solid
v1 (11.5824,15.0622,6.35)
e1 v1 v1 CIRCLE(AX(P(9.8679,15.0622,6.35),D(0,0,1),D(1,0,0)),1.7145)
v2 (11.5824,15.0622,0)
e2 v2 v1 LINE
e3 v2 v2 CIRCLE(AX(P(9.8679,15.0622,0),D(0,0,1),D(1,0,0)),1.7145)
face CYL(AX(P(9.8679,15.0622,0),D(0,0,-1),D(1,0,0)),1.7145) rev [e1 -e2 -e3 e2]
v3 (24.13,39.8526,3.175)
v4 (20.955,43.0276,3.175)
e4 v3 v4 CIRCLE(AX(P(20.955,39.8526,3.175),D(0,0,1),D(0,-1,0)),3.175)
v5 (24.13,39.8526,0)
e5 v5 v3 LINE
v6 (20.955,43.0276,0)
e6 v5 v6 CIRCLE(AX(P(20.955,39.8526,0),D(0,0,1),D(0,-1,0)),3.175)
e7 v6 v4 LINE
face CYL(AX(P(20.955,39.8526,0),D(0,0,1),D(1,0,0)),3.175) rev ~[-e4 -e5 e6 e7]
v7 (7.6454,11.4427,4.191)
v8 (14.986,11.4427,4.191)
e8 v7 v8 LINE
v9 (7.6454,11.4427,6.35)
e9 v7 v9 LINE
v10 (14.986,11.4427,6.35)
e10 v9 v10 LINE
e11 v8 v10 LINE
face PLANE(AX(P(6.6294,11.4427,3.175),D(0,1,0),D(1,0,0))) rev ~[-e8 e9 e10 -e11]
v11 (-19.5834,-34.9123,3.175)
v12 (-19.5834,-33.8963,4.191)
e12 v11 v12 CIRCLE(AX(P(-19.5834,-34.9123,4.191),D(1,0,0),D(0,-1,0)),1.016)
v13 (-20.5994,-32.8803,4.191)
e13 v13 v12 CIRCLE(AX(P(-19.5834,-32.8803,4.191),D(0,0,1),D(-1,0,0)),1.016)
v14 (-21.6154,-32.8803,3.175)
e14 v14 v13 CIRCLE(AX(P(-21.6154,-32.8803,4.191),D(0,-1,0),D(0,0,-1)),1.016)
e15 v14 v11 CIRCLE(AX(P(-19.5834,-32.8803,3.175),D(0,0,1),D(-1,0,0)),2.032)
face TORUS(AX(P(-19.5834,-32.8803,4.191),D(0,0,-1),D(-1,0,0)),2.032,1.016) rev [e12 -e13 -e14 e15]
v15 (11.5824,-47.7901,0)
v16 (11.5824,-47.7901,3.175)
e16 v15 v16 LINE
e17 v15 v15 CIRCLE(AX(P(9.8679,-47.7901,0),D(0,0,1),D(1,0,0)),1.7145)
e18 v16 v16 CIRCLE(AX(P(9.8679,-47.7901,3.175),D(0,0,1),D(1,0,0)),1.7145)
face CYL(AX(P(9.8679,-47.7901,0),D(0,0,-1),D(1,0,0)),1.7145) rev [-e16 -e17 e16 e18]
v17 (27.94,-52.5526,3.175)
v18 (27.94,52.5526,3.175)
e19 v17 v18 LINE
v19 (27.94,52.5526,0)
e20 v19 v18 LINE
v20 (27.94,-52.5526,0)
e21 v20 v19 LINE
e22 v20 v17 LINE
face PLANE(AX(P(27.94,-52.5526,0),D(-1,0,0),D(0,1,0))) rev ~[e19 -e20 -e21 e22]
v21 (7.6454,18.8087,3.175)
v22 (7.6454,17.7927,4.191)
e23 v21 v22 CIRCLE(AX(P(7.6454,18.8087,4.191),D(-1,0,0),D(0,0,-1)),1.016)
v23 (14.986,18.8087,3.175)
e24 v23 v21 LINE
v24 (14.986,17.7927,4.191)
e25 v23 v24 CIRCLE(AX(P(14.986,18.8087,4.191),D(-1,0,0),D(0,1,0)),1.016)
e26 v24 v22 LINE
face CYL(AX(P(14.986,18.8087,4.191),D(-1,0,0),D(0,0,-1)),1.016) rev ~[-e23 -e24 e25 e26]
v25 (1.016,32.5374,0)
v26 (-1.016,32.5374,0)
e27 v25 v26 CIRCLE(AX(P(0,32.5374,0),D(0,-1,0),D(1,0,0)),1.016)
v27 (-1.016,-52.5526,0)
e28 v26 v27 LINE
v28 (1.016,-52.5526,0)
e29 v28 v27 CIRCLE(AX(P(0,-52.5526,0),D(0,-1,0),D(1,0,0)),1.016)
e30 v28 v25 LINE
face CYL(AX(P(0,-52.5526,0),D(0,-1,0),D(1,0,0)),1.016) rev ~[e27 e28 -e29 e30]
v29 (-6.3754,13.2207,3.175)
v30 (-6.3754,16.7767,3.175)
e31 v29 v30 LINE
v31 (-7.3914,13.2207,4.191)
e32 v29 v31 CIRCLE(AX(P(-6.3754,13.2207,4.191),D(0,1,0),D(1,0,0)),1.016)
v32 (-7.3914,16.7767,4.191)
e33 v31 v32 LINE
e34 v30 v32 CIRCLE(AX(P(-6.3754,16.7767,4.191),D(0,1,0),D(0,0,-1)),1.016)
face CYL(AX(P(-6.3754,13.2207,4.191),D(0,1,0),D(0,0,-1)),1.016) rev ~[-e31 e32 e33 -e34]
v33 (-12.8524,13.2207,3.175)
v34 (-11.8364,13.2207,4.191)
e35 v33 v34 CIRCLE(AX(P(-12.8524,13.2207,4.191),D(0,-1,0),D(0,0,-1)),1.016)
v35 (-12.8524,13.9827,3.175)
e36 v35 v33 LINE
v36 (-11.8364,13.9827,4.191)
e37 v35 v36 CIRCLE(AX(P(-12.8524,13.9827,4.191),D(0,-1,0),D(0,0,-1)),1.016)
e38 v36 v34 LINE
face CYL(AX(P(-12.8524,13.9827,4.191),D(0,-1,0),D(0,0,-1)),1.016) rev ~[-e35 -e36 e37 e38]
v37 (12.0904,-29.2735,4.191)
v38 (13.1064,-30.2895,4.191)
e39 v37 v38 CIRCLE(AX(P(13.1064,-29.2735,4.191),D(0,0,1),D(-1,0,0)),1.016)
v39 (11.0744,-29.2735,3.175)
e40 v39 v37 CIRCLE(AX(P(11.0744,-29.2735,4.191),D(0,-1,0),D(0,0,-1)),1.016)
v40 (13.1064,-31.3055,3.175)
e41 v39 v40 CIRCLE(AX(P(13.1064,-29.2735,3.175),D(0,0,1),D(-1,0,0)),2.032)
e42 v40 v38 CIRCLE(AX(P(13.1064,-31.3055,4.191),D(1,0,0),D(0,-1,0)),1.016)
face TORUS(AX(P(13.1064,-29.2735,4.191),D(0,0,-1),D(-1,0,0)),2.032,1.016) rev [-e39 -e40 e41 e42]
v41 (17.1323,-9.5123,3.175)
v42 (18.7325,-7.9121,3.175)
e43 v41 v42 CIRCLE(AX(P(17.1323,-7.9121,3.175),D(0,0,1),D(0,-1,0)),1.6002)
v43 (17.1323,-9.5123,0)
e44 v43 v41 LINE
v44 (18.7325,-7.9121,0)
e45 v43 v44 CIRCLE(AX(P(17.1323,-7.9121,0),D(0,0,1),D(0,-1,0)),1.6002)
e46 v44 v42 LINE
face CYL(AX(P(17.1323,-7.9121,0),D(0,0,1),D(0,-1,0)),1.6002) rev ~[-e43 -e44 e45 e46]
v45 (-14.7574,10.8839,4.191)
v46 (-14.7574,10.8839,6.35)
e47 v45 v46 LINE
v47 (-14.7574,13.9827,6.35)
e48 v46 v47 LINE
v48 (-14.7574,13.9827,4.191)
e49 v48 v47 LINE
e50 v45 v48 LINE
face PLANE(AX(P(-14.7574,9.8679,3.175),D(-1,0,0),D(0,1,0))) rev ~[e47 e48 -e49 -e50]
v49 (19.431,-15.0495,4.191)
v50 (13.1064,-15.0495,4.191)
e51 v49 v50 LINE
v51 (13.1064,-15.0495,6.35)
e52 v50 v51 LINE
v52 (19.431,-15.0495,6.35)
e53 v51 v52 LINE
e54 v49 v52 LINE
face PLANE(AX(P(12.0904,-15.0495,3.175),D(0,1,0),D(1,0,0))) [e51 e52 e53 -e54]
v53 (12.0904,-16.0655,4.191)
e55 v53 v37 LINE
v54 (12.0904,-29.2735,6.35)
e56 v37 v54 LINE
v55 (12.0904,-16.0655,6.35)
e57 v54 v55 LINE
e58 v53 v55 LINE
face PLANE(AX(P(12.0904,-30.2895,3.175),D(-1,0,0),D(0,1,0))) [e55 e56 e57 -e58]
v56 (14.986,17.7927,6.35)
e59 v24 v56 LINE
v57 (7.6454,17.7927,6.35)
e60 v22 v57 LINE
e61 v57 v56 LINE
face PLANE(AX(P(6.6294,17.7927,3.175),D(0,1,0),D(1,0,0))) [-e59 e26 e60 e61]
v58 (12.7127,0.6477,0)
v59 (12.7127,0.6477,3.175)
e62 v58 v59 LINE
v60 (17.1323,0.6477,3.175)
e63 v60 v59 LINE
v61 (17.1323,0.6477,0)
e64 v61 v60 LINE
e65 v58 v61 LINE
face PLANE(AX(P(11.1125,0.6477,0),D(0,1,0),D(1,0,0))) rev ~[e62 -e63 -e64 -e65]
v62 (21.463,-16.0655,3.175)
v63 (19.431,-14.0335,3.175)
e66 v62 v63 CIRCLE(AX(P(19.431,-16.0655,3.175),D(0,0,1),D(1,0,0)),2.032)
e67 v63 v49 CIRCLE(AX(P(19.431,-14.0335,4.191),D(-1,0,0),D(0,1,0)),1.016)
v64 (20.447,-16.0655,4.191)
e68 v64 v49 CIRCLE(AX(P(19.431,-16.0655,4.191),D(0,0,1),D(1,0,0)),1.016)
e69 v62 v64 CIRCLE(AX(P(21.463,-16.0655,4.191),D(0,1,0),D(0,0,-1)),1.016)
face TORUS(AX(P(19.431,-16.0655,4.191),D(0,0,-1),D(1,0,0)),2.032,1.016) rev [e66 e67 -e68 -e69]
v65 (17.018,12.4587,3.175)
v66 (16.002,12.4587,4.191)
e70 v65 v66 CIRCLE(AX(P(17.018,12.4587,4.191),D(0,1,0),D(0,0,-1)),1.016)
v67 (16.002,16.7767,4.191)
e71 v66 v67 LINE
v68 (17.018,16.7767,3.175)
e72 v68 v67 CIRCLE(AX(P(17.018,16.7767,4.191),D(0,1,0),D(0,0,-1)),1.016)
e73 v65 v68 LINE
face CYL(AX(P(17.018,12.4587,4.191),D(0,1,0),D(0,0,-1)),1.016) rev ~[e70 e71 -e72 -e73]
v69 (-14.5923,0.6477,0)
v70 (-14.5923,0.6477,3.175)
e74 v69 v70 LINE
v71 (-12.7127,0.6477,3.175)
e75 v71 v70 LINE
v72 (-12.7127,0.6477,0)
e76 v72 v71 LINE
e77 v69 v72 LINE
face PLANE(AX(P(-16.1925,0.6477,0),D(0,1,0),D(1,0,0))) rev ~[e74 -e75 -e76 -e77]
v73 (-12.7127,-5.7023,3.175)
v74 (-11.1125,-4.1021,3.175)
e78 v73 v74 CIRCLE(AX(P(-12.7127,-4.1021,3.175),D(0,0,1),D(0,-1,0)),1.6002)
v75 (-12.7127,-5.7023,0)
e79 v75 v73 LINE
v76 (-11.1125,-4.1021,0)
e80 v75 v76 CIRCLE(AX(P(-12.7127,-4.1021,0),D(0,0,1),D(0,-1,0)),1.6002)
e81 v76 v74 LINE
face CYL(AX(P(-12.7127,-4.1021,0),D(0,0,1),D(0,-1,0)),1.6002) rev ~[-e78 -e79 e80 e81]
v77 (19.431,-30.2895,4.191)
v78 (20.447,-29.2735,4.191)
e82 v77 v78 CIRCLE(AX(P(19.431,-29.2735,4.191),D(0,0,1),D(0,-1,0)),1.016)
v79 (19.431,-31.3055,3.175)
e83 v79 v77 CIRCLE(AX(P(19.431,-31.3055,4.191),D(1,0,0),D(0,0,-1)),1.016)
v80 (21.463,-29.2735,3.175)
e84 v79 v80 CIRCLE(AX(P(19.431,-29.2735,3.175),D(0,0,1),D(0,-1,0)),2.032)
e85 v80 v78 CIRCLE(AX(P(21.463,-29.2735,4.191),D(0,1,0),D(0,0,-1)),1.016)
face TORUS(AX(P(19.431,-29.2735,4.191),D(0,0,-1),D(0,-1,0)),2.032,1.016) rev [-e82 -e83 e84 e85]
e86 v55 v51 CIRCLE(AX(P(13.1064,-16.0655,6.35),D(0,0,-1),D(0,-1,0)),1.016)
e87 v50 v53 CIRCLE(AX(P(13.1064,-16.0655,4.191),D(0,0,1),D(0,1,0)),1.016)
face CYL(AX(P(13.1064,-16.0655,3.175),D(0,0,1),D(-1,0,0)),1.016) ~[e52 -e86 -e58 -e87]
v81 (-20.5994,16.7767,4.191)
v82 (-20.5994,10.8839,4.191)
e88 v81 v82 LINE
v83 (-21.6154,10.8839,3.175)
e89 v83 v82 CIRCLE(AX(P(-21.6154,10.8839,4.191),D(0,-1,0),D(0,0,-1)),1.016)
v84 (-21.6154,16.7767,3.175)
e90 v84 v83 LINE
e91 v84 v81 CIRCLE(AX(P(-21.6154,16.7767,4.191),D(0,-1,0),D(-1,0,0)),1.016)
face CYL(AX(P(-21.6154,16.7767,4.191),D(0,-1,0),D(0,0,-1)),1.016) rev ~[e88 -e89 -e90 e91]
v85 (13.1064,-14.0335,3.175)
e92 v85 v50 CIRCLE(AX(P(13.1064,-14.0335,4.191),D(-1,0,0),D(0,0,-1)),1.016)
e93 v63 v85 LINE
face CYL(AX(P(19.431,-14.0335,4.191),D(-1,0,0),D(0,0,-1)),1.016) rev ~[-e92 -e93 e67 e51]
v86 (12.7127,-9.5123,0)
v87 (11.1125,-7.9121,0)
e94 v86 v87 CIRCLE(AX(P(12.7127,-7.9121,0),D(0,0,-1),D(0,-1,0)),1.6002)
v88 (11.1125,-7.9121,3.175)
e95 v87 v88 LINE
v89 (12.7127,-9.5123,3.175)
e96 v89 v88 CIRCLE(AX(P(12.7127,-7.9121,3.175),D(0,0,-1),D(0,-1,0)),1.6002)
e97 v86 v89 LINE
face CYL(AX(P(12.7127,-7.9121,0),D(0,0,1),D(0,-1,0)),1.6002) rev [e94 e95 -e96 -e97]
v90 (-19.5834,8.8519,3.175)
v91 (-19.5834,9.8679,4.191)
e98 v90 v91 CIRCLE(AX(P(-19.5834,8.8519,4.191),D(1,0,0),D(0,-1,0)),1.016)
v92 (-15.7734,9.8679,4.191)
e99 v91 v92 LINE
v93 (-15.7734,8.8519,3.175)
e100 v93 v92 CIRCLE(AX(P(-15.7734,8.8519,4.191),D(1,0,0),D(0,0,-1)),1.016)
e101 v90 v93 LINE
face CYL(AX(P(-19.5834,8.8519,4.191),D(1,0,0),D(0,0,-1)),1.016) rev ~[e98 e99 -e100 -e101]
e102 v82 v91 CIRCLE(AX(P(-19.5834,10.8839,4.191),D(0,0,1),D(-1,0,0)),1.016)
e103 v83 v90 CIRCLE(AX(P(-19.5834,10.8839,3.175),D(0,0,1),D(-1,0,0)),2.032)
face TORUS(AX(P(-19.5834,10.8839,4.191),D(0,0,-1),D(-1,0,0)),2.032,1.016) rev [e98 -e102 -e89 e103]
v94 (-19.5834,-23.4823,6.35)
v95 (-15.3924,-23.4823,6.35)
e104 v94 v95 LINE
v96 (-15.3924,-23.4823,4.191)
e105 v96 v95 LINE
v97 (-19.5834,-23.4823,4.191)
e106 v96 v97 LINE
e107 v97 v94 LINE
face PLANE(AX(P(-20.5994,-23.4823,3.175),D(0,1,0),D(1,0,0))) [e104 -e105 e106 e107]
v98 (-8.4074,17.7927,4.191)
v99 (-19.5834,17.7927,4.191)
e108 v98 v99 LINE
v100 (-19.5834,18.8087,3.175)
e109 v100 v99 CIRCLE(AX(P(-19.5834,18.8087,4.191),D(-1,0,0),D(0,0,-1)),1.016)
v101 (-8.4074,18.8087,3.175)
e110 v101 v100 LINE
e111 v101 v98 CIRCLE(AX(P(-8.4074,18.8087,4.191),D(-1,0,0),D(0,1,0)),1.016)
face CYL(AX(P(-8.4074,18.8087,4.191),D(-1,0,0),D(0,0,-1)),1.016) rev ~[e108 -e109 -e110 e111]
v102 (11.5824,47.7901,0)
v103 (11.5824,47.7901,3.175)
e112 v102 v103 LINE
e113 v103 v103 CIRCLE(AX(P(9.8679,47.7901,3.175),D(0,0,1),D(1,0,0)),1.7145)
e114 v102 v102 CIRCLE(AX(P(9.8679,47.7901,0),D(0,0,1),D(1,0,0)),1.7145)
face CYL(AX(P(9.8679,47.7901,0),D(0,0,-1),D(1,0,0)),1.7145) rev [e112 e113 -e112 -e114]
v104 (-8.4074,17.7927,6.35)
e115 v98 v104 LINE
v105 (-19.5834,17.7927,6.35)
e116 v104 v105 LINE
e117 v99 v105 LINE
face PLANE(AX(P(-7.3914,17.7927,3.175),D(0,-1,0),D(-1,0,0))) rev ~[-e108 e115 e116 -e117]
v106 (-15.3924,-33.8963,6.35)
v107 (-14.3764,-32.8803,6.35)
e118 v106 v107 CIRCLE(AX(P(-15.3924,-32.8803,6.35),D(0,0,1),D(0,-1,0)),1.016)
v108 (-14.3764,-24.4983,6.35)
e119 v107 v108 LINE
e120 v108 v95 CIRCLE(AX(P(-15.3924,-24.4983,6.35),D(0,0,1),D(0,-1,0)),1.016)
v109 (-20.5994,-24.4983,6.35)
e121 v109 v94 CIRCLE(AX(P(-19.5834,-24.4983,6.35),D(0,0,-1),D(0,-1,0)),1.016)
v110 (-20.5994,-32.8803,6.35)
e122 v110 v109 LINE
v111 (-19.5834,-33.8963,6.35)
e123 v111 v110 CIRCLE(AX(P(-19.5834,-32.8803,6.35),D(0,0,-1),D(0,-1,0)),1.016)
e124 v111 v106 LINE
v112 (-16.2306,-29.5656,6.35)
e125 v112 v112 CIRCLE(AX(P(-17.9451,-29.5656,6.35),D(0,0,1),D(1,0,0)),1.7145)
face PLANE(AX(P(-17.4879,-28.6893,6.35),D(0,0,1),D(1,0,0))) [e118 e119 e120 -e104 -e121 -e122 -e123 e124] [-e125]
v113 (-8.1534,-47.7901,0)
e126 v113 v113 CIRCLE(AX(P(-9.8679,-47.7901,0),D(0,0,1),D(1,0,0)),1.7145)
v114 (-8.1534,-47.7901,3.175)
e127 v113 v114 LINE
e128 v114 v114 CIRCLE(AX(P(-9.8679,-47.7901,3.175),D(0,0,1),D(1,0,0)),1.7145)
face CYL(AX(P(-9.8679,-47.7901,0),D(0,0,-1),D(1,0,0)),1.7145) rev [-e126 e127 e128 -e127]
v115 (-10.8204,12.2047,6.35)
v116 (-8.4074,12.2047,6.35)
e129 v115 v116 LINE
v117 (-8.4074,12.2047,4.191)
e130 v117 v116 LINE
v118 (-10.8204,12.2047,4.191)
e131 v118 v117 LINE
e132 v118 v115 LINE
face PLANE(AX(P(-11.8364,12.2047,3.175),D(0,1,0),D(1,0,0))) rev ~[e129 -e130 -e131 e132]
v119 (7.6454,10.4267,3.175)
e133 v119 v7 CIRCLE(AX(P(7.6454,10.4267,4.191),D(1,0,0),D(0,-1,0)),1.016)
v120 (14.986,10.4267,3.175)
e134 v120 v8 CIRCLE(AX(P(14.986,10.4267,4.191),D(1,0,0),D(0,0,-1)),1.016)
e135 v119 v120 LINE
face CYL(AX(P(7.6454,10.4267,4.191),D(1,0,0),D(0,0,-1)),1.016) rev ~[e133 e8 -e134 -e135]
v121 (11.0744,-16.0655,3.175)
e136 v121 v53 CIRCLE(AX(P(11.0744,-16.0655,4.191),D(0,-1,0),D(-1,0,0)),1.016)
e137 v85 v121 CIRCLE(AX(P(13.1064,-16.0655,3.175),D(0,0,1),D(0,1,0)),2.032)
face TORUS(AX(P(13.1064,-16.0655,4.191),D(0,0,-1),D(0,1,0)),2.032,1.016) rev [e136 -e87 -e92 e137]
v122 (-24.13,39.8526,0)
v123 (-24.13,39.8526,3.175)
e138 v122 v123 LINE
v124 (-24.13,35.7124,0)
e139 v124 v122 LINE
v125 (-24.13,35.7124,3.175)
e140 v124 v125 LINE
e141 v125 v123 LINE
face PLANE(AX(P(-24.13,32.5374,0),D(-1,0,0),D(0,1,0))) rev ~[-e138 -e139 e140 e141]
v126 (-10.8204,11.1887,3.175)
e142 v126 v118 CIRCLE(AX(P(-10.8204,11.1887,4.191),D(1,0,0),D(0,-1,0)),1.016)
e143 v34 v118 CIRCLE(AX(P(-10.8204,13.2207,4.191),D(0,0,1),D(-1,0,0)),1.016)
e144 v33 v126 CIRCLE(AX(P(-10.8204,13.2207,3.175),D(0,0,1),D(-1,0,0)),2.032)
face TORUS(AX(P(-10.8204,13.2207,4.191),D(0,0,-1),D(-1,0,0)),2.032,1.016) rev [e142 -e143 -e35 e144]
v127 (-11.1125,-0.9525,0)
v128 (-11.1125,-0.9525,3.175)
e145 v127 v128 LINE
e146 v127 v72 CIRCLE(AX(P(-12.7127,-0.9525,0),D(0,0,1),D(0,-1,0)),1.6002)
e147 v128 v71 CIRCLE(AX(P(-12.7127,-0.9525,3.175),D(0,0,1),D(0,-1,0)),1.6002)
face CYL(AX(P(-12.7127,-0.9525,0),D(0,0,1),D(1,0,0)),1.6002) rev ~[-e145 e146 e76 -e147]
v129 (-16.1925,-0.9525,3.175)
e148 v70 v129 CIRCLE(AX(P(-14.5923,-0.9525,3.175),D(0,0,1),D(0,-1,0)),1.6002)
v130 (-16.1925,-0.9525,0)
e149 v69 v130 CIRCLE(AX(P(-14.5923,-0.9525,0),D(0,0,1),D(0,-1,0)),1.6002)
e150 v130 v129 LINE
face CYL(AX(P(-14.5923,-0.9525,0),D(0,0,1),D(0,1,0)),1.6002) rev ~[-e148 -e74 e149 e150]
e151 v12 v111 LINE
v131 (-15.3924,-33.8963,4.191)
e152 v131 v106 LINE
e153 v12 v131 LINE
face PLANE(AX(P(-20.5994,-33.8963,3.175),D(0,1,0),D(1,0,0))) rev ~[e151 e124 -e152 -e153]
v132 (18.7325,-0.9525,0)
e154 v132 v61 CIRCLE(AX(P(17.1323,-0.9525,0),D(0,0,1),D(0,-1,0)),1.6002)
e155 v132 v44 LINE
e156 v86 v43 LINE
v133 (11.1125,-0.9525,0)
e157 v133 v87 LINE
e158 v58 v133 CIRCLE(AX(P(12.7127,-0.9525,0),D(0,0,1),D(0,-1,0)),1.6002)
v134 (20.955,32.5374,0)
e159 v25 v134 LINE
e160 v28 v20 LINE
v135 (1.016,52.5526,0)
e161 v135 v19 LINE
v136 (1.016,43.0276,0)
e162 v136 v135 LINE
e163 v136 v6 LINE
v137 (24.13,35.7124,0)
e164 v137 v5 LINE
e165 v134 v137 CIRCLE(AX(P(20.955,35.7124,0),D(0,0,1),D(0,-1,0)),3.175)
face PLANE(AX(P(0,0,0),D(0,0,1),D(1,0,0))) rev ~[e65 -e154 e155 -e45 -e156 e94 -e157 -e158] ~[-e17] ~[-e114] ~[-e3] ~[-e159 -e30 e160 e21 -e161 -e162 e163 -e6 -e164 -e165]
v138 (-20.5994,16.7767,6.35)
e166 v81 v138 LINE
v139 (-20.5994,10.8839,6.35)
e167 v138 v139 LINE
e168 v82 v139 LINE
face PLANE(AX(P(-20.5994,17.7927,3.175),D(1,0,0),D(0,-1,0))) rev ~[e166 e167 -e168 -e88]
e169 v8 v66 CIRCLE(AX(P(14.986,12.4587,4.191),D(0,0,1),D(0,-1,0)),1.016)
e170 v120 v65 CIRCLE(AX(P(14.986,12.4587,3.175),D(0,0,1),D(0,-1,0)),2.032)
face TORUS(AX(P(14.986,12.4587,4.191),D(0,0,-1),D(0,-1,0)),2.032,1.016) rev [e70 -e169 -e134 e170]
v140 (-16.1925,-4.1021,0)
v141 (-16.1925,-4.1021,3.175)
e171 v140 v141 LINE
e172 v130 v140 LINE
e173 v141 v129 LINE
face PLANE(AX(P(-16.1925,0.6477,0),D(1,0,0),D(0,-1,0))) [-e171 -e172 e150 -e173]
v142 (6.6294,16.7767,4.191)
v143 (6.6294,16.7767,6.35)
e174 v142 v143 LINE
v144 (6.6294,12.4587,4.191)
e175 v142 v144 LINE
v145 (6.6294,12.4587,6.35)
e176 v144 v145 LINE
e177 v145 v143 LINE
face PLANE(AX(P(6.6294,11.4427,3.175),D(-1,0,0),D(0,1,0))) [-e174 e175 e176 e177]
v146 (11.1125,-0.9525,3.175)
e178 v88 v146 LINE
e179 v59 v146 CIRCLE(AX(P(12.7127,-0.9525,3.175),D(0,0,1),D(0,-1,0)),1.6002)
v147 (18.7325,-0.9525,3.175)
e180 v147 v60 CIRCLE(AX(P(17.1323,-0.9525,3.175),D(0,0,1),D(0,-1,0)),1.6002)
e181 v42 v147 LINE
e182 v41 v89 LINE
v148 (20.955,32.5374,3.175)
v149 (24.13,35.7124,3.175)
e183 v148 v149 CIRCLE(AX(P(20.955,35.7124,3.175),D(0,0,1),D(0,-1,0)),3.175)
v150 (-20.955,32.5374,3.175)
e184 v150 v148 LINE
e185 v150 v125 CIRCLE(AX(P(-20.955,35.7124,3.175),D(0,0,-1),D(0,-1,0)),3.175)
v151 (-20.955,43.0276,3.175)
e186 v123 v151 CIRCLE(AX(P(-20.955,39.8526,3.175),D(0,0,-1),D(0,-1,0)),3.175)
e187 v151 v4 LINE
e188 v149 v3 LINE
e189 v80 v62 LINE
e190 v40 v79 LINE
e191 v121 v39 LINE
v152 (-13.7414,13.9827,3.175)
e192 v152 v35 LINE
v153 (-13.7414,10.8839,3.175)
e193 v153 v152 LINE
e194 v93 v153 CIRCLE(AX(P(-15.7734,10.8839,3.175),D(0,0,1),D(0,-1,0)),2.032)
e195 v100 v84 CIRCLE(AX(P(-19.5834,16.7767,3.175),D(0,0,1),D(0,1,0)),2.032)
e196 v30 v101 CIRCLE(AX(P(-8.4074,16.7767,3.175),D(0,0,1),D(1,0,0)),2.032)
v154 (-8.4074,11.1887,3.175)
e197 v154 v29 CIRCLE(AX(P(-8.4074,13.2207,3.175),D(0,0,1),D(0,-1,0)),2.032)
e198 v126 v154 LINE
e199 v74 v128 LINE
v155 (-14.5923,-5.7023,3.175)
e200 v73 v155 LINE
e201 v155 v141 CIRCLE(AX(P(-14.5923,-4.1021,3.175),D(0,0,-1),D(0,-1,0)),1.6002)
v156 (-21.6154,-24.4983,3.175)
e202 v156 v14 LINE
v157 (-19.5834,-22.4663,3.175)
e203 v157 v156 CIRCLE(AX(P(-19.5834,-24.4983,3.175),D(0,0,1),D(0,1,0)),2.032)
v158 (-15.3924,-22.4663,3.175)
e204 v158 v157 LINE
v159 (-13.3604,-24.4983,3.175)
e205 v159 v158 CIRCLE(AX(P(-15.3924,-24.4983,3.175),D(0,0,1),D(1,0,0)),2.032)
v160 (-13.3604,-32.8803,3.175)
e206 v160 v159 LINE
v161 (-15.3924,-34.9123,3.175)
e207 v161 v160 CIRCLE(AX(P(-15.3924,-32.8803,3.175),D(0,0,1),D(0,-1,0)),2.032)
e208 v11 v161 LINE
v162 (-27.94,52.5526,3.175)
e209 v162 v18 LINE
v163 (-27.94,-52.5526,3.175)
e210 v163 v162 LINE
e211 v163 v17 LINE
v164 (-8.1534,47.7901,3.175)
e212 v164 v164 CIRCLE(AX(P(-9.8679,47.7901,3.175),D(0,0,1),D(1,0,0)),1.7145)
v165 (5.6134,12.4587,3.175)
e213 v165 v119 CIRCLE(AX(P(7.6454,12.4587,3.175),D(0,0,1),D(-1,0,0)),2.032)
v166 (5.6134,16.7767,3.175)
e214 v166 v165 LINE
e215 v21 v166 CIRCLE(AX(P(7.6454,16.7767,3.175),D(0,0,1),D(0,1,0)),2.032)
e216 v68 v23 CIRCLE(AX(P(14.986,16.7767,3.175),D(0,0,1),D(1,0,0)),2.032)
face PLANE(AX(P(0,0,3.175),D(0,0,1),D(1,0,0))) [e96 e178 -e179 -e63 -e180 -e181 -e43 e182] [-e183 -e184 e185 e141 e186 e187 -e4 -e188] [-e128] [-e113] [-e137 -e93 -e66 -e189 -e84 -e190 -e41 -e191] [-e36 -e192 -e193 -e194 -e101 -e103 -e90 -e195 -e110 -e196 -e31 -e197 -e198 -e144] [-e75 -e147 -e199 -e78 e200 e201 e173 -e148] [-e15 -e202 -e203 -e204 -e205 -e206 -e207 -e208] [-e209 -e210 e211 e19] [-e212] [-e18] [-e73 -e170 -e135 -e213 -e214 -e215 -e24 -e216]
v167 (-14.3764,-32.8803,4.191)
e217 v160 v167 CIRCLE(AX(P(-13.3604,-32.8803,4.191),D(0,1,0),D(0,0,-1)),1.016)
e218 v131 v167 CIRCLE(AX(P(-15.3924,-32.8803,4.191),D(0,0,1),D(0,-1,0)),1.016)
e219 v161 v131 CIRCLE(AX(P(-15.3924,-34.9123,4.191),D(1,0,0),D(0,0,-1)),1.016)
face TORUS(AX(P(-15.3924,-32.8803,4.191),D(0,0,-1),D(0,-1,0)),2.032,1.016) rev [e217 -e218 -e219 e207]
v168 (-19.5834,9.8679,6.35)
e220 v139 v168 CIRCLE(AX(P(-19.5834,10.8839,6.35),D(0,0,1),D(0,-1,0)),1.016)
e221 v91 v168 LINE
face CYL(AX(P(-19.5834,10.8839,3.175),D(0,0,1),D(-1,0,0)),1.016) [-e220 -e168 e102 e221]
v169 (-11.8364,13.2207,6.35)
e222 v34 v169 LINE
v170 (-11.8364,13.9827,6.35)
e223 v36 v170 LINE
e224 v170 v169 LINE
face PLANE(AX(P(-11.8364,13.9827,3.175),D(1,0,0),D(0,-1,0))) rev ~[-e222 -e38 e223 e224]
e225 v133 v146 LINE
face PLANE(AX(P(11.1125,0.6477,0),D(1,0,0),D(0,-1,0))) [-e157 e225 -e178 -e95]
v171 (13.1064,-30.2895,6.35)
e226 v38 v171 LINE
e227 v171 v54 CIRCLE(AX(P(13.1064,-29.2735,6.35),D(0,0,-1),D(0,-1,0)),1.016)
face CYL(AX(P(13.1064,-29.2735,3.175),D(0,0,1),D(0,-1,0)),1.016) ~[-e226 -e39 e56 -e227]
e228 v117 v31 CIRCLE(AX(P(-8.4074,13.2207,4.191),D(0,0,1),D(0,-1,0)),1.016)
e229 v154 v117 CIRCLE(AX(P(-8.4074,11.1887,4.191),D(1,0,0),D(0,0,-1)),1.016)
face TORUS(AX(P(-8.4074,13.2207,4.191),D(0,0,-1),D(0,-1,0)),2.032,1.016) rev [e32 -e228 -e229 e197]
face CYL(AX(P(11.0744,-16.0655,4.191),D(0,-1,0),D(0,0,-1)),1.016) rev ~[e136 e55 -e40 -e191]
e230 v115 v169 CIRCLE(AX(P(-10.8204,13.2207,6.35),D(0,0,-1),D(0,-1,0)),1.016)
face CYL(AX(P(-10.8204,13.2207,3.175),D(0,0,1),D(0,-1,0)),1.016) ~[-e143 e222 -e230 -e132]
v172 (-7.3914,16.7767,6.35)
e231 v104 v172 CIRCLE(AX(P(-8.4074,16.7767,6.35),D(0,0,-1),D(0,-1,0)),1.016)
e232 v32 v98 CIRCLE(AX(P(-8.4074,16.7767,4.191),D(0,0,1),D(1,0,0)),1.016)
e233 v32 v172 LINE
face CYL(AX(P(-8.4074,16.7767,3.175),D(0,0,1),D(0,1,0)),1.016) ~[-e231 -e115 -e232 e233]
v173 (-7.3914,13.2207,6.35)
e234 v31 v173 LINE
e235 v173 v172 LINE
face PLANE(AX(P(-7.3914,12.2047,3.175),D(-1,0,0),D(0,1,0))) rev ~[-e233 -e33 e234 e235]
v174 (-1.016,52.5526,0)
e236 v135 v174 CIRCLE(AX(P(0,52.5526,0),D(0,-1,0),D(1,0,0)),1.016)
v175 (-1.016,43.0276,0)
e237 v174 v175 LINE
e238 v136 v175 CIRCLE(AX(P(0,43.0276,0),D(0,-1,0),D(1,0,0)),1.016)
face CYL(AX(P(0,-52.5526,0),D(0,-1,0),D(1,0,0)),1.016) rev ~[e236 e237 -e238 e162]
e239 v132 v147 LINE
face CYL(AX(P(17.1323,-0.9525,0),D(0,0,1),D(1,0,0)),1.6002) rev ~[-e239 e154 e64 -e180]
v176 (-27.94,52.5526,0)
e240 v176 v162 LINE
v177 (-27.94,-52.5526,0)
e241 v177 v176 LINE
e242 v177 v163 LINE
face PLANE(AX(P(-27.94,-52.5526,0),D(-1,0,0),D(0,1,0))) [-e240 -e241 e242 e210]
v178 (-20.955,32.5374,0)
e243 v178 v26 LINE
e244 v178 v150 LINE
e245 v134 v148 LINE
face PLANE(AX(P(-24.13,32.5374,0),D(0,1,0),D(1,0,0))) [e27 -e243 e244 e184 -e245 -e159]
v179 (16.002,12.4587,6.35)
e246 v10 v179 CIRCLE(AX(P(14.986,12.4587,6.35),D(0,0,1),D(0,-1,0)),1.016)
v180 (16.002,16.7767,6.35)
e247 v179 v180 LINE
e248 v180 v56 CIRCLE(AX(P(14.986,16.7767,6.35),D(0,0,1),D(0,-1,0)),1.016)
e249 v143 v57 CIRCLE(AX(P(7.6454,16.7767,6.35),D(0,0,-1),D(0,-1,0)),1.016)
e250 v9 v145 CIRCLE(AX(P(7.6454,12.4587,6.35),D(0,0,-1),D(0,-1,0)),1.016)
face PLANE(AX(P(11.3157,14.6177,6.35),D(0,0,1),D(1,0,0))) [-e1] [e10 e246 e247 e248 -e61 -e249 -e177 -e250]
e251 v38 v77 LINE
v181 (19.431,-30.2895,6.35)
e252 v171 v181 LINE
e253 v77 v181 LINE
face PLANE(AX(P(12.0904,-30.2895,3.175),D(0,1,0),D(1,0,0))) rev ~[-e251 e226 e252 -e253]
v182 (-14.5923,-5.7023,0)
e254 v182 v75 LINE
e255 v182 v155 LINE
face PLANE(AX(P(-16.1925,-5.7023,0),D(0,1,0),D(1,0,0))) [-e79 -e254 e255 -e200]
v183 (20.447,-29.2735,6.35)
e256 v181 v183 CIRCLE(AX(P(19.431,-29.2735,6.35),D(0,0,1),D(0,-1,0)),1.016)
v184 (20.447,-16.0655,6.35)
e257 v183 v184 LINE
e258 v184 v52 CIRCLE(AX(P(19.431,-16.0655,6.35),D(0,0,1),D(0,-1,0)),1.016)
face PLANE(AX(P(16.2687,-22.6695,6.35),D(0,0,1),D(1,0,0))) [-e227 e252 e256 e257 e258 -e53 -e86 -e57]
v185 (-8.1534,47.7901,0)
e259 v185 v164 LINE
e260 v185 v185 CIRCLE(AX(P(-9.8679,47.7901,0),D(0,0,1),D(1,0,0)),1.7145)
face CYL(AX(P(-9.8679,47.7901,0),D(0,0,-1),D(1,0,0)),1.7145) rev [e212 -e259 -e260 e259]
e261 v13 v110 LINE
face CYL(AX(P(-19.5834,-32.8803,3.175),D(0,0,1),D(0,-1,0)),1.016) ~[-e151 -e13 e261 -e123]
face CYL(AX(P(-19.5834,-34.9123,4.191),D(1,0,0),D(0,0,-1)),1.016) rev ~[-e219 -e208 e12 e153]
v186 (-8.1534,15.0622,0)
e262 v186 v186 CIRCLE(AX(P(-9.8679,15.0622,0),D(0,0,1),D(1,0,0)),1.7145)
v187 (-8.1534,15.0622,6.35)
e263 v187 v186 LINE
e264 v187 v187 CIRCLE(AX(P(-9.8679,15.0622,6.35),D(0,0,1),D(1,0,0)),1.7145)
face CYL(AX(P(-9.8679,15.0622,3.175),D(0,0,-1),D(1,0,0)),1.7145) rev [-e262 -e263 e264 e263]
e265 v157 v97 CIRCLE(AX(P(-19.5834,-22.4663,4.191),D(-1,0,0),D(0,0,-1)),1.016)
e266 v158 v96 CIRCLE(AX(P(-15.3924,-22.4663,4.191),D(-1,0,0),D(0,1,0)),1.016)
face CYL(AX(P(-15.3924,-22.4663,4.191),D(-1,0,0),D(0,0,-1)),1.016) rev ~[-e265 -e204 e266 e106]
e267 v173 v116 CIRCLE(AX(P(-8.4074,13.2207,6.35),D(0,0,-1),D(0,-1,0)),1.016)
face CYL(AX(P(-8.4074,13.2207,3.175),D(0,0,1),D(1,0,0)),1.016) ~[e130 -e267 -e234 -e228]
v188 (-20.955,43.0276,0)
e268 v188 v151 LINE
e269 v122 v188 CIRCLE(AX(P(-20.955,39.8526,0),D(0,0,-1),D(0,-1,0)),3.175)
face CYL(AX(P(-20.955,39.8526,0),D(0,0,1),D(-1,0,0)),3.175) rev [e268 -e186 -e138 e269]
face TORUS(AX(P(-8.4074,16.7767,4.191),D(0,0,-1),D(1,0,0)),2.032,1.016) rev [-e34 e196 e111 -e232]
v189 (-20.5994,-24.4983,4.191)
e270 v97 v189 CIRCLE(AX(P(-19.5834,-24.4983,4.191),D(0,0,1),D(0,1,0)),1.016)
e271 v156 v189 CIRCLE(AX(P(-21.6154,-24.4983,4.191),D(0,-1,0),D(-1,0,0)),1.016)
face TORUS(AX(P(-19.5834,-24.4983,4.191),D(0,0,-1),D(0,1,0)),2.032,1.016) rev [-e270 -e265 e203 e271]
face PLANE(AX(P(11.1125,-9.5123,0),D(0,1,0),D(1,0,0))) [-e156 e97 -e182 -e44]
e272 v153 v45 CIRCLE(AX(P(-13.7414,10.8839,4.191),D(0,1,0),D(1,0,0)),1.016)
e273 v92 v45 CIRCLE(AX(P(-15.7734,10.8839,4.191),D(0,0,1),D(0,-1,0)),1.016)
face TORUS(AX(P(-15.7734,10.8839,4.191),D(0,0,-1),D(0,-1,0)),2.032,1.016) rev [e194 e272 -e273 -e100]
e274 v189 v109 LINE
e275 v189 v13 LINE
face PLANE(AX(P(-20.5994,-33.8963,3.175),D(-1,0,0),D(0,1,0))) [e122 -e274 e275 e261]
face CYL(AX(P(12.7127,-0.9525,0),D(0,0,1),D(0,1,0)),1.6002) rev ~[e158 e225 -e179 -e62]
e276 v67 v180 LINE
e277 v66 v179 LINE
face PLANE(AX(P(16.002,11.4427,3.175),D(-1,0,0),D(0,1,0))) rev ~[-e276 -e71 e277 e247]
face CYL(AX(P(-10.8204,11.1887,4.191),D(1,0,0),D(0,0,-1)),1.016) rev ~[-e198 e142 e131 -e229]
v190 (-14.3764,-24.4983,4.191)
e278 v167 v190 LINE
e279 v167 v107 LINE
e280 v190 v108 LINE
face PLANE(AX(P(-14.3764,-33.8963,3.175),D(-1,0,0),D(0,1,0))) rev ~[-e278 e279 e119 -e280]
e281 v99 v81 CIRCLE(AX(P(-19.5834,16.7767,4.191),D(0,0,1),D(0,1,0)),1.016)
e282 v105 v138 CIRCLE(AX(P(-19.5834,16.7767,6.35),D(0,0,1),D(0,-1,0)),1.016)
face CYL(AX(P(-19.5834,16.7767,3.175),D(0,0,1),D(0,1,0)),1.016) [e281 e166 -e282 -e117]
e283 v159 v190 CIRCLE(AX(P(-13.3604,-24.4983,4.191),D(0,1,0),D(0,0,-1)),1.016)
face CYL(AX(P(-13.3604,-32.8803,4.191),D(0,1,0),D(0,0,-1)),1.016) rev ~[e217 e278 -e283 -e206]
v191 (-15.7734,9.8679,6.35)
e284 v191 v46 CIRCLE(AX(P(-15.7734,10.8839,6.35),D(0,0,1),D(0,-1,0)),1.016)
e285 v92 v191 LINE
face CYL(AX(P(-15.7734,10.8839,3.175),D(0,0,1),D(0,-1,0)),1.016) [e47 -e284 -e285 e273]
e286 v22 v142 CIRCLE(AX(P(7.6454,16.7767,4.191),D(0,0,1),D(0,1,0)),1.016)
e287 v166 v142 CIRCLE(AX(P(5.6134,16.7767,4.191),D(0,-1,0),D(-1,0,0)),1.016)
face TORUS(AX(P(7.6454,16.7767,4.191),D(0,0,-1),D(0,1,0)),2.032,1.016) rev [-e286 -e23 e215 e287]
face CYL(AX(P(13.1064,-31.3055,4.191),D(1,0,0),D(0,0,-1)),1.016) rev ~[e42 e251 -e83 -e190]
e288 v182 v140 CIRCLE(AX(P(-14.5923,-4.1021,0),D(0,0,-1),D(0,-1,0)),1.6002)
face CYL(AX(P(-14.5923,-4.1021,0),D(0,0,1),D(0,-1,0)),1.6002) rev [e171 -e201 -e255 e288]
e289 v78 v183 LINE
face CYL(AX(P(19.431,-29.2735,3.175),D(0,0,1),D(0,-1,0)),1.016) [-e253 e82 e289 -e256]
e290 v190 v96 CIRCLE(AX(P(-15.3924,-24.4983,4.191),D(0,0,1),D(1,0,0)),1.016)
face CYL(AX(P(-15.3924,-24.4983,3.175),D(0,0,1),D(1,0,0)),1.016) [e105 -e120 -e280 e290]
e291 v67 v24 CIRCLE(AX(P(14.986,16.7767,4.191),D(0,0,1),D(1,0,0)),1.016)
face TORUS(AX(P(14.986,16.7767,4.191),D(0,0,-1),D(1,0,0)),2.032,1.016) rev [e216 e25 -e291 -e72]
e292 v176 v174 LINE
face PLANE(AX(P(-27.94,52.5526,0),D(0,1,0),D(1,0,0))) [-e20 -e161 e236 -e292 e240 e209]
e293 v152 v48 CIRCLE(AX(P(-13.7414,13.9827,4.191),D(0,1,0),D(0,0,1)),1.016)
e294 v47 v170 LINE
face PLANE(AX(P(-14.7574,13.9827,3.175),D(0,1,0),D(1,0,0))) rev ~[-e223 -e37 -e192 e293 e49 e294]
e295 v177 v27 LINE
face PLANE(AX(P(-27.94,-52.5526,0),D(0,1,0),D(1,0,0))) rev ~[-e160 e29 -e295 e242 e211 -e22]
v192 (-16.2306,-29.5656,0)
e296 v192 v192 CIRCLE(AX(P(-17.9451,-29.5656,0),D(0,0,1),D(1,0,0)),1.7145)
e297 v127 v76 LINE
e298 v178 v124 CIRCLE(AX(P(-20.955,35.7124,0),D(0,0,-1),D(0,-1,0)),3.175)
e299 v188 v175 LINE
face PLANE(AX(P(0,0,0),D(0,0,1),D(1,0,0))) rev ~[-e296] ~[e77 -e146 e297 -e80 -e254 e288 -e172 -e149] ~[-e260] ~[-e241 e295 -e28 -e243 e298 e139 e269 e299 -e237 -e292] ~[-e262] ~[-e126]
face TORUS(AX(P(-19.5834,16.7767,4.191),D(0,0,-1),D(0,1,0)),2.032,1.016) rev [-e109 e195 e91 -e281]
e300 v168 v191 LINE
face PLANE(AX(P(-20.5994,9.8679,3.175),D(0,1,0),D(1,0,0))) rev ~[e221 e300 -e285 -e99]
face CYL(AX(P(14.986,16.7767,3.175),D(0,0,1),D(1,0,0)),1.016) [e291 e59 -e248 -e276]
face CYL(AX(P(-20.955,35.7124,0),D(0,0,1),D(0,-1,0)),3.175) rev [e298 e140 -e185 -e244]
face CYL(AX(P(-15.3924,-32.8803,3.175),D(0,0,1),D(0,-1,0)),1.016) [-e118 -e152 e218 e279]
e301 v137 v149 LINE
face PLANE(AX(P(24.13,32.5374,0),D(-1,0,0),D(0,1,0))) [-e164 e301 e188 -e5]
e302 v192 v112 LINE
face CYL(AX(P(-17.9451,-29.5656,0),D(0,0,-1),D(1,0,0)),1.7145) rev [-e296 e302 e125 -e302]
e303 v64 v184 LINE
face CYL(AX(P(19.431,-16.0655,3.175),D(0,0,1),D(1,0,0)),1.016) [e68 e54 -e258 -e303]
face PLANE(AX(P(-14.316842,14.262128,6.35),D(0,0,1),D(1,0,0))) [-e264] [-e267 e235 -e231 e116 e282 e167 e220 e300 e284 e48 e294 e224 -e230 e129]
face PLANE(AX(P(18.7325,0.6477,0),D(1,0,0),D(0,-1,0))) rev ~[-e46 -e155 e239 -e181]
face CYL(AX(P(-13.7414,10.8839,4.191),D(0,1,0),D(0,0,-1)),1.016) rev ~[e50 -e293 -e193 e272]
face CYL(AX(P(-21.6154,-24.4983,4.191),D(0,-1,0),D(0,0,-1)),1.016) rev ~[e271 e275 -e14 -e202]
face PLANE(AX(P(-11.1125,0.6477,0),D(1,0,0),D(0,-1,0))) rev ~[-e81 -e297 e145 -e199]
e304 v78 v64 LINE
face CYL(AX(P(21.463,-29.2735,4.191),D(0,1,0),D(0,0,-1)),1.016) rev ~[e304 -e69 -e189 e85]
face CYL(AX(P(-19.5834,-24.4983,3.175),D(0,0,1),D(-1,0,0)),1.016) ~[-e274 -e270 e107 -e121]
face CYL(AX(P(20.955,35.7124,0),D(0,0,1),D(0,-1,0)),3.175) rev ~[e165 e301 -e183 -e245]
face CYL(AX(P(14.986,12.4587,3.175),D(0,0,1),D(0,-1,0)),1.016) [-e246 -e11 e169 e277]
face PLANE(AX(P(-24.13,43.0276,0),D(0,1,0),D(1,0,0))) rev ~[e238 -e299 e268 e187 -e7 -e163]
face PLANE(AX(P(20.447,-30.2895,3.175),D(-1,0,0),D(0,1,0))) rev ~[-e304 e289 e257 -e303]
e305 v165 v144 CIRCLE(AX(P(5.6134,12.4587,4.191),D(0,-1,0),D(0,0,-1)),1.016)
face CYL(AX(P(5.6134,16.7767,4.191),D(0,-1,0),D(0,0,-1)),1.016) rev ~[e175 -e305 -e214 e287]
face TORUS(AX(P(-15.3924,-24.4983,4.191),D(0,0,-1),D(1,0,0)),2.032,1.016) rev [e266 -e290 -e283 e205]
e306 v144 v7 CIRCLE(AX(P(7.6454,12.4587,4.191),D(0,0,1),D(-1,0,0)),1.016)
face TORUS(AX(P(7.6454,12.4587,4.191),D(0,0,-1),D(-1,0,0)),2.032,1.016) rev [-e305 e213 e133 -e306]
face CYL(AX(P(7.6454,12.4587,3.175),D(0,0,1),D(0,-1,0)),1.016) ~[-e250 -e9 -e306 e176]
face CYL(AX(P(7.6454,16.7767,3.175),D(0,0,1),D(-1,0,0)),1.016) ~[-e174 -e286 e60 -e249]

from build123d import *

# Parameters (mm, degrees)
F0_W     = 55.88
F0_H     = 105.1052
F0_R     = 1.7145
F0_W_2   = 48.26
F0_H_2   = 10.4902
F1_DEPTH = 3.175
F2_R     = 1.016
F3_DEPTH = 105.1062
F4_R     = 1.7145
F4_W     = 9.3726
F4_H     = 6.35
F4_W_2   = 6.223
F4_H_2   = 10.414
F4_W_3   = 8.3566
F4_H_3   = 15.24
F5_DEPTH = 3.175
F6_W     = 7.62
F6_H     = 10.16
F6_W_2   = 5.08
F6_H_2   = 6.35
F7_DEPTH = 25.4
F8_R     = 1.6002
F9_R     = 3.175
F10_F1_R = 1.016
F10_F2_R = 1.016


# Not quite as in the source:
# - a feature names something its author has since deleted; it is built from what else it names


with BuildPart() as f1:
    # F0 (on Top) → F1 (new body)
    with BuildSketch(Plane.XY):
        Rectangle(F0_W, F0_H)
        with Locations((-17.9451, -29.5656)):
            Circle(F0_R, mode=Mode.SUBTRACT)
        with Locations((-9.8679, -47.7901)):
            Circle(F0_R, mode=Mode.SUBTRACT)
        with Locations((9.8679, -47.7901)):
            Circle(F0_R, mode=Mode.SUBTRACT)
        with Locations((-9.8679, 15.0622)):
            Circle(F0_R, mode=Mode.SUBTRACT)
        with Locations((0, 37.7825)):
            Rectangle(F0_W_2, F0_H_2, mode=Mode.SUBTRACT)
        with Locations((-9.8679, 47.7901)):
            Circle(F0_R, mode=Mode.SUBTRACT)
        with Locations((9.8679, 15.0622)):
            Circle(F0_R, mode=Mode.SUBTRACT)
        with Locations((9.8679, 47.7901)):
            Circle(F0_R, mode=Mode.SUBTRACT)
    extrude(amount=F1_DEPTH)

    # F2 (on face) → F3 (cut, through all)
    with BuildSketch(Plane.XZ.offset(52.5526)):
        Circle(F2_R)
    extrude(amount=-F3_DEPTH, mode=Mode.SUBTRACT)

    # F4 (on face) → F5 (join)
    with BuildSketch(Plane.XY.offset(3.175)):
        Polygon((-7.3914, 17.7927), (-20.5994, 17.7927), (-20.5994, 14.8093839596), (-20.5994, 9.8679), (-14.7574, 9.8679), (-14.7574, 13.9827), (-11.8364, 13.9827), (-11.8364, 12.2047), (-7.3914, 12.2047), (-7.3914, 13.9827), align=None)
        with Locations((-9.8679, 15.0622)):
            Circle(F4_R, mode=Mode.SUBTRACT)
        with Locations((11.3157, 14.6177)):
            Rectangle(F4_W, F4_H)
        with Locations((9.8679, 15.0622)):
            Circle(F4_R, mode=Mode.SUBTRACT)
        with Locations((-17.4879, -28.6893)):
            Rectangle(F4_W_2, F4_H_2)
        with Locations((-17.9451, -29.5656)):
            Circle(F4_R, mode=Mode.SUBTRACT)
        with Locations((16.2687, -22.6695)):
            Rectangle(F4_W_3, F4_H_3)
    extrude(amount=F5_DEPTH)

    # F6 (on face) → F7 (cut)
    with BuildSketch(Plane(origin=(0, 0, 0), x_dir=(1, 0, 0), z_dir=(0, 0, -1))):
        with Locations((14.9225, 4.4323)):
            Rectangle(F6_W, F6_H)
        with Locations((-13.6525, 2.5273)):
            Rectangle(F6_W_2, F6_H_2)
    extrude(amount=-F7_DEPTH, mode=Mode.SUBTRACT)

    # F8
    f8_edges = [f1.edges().sort_by_distance(p)[0] for p in [
        (-16.1925, 0.6477, 1.5875),
        (11.1125, 0.6477, 1.5875),
        (18.7325, 0.6477, 1.5875),
        (18.7325, -9.5123, 1.5875),
        (11.1125, -9.5123, 1.5875),
        (-16.1925, -5.7023, 1.5875),
        (-11.1125, -5.7023, 1.5875),
        (-11.1125, 0.6477, 1.5875),
    ]]
    fillet(f8_edges, radius=F8_R)

    # F9
    f9_edges = [f1.edges().sort_by_distance(p)[0] for p in [
        (-24.13, 32.5374, 1.5875),
        (24.13, 32.5374, 1.5875),
        (24.13, 43.0276, 1.5875),
        (-24.13, 43.0276, 1.5875),
    ]]
    fillet(f9_edges, radius=F9_R)

    # F10: fillet of radius 1.016 on 34 edges, made by hand

    # F10_f1
    f10_f1_edges = [f1.edges().sort_by_distance(p)[0] for p in [
        (-7.3914, 17.7927, 4.7625),
        (6.6294, 17.7927, 4.7625),
        (16.002, 17.7927, 4.7625),
        (20.447, -15.0495, 4.7625),
        (12.0904, -15.0495, 4.7625),
        (20.447, -30.2895, 4.7625),
        (12.0904, -30.2895, 4.7625),
        (-14.3764, -33.8963, 4.7625),
        (-20.5994, -33.8963, 4.7625),
        (-14.3764, -23.4823, 4.7625),
        (-20.5994, -23.4823, 4.7625),
        (6.6294, 11.4427, 4.7625),
        (16.002, 11.4427, 4.7625),
        (-20.5994, 17.7927, 4.7625),
        (-20.5994, 9.8679, 4.7625),
        (-14.7574, 9.8679, 4.7625),
        (-7.3914, 12.2047, 4.7625),
        (-11.8364, 12.2047, 4.7625),
    ]]
    fillet(f10_f1_edges, radius=F10_F1_R)

    # F10_f2
    f10_f2_edges = [f1.edges().sort_by_distance(p)[0] for p in [
        (-14.3764, -28.6893, 3.175),
        (20.447, -22.6695, 3.175),
        (16.002, 14.6177, 3.175),
        (-7.3914, 14.9987, 3.175),
        (-20.5994, -28.6893, 3.175),
        (-17.4879, -23.4823, 3.175),
        (-17.4879, -33.8963, 3.175),
        (16.2687, -30.2895, 3.175),
        (16.2687, -15.0495, 3.175),
        (12.0904, -22.6695, 3.175),
        (-13.9954, 17.7927, 3.175),
        (-20.5994, 13.8303, 3.175),
        (-17.6784, 9.8679, 3.175),
        (11.3157, 11.4427, 3.175),
        (11.3157, 17.7927, 3.175),
        (6.6294, 14.6177, 3.175),
        (6.9269795103, 17.4951204897, 3.175),
        (6.9269795103, 11.7402795103, 3.175),
        (15.7044204897, 17.4951204897, 3.175),
        (15.7044204897, 11.7402795103, 3.175),
        (-20.3018204897, 10.1654795103, 3.175),
        (-15.0549795103, 10.1654795103, 3.175),
        (-20.3018204897, 17.4951204897, 3.175),
        (-7.6889795103, 17.4951204897, 3.175),
        (12.3879795103, -15.3470795103, 3.175),
        (12.3879795103, -29.9919204897, 3.175),
        (20.1494204897, -15.3470795103, 3.175),
        (20.1494204897, -29.9919204897, 3.175),
        (-20.3018204897, -33.5987204897, 3.175),
        (-14.6739795103, -33.5987204897, 3.175),
        (-14.6739795103, -23.7798795103, 3.175),
        (-20.3018204897, -23.7798795103, 3.175),
        (-7.6889795103, 12.5022795103, 3.175),
    ]]
    fillet(f10_f2_edges, radius=F10_F2_R)


solid = f1.part
